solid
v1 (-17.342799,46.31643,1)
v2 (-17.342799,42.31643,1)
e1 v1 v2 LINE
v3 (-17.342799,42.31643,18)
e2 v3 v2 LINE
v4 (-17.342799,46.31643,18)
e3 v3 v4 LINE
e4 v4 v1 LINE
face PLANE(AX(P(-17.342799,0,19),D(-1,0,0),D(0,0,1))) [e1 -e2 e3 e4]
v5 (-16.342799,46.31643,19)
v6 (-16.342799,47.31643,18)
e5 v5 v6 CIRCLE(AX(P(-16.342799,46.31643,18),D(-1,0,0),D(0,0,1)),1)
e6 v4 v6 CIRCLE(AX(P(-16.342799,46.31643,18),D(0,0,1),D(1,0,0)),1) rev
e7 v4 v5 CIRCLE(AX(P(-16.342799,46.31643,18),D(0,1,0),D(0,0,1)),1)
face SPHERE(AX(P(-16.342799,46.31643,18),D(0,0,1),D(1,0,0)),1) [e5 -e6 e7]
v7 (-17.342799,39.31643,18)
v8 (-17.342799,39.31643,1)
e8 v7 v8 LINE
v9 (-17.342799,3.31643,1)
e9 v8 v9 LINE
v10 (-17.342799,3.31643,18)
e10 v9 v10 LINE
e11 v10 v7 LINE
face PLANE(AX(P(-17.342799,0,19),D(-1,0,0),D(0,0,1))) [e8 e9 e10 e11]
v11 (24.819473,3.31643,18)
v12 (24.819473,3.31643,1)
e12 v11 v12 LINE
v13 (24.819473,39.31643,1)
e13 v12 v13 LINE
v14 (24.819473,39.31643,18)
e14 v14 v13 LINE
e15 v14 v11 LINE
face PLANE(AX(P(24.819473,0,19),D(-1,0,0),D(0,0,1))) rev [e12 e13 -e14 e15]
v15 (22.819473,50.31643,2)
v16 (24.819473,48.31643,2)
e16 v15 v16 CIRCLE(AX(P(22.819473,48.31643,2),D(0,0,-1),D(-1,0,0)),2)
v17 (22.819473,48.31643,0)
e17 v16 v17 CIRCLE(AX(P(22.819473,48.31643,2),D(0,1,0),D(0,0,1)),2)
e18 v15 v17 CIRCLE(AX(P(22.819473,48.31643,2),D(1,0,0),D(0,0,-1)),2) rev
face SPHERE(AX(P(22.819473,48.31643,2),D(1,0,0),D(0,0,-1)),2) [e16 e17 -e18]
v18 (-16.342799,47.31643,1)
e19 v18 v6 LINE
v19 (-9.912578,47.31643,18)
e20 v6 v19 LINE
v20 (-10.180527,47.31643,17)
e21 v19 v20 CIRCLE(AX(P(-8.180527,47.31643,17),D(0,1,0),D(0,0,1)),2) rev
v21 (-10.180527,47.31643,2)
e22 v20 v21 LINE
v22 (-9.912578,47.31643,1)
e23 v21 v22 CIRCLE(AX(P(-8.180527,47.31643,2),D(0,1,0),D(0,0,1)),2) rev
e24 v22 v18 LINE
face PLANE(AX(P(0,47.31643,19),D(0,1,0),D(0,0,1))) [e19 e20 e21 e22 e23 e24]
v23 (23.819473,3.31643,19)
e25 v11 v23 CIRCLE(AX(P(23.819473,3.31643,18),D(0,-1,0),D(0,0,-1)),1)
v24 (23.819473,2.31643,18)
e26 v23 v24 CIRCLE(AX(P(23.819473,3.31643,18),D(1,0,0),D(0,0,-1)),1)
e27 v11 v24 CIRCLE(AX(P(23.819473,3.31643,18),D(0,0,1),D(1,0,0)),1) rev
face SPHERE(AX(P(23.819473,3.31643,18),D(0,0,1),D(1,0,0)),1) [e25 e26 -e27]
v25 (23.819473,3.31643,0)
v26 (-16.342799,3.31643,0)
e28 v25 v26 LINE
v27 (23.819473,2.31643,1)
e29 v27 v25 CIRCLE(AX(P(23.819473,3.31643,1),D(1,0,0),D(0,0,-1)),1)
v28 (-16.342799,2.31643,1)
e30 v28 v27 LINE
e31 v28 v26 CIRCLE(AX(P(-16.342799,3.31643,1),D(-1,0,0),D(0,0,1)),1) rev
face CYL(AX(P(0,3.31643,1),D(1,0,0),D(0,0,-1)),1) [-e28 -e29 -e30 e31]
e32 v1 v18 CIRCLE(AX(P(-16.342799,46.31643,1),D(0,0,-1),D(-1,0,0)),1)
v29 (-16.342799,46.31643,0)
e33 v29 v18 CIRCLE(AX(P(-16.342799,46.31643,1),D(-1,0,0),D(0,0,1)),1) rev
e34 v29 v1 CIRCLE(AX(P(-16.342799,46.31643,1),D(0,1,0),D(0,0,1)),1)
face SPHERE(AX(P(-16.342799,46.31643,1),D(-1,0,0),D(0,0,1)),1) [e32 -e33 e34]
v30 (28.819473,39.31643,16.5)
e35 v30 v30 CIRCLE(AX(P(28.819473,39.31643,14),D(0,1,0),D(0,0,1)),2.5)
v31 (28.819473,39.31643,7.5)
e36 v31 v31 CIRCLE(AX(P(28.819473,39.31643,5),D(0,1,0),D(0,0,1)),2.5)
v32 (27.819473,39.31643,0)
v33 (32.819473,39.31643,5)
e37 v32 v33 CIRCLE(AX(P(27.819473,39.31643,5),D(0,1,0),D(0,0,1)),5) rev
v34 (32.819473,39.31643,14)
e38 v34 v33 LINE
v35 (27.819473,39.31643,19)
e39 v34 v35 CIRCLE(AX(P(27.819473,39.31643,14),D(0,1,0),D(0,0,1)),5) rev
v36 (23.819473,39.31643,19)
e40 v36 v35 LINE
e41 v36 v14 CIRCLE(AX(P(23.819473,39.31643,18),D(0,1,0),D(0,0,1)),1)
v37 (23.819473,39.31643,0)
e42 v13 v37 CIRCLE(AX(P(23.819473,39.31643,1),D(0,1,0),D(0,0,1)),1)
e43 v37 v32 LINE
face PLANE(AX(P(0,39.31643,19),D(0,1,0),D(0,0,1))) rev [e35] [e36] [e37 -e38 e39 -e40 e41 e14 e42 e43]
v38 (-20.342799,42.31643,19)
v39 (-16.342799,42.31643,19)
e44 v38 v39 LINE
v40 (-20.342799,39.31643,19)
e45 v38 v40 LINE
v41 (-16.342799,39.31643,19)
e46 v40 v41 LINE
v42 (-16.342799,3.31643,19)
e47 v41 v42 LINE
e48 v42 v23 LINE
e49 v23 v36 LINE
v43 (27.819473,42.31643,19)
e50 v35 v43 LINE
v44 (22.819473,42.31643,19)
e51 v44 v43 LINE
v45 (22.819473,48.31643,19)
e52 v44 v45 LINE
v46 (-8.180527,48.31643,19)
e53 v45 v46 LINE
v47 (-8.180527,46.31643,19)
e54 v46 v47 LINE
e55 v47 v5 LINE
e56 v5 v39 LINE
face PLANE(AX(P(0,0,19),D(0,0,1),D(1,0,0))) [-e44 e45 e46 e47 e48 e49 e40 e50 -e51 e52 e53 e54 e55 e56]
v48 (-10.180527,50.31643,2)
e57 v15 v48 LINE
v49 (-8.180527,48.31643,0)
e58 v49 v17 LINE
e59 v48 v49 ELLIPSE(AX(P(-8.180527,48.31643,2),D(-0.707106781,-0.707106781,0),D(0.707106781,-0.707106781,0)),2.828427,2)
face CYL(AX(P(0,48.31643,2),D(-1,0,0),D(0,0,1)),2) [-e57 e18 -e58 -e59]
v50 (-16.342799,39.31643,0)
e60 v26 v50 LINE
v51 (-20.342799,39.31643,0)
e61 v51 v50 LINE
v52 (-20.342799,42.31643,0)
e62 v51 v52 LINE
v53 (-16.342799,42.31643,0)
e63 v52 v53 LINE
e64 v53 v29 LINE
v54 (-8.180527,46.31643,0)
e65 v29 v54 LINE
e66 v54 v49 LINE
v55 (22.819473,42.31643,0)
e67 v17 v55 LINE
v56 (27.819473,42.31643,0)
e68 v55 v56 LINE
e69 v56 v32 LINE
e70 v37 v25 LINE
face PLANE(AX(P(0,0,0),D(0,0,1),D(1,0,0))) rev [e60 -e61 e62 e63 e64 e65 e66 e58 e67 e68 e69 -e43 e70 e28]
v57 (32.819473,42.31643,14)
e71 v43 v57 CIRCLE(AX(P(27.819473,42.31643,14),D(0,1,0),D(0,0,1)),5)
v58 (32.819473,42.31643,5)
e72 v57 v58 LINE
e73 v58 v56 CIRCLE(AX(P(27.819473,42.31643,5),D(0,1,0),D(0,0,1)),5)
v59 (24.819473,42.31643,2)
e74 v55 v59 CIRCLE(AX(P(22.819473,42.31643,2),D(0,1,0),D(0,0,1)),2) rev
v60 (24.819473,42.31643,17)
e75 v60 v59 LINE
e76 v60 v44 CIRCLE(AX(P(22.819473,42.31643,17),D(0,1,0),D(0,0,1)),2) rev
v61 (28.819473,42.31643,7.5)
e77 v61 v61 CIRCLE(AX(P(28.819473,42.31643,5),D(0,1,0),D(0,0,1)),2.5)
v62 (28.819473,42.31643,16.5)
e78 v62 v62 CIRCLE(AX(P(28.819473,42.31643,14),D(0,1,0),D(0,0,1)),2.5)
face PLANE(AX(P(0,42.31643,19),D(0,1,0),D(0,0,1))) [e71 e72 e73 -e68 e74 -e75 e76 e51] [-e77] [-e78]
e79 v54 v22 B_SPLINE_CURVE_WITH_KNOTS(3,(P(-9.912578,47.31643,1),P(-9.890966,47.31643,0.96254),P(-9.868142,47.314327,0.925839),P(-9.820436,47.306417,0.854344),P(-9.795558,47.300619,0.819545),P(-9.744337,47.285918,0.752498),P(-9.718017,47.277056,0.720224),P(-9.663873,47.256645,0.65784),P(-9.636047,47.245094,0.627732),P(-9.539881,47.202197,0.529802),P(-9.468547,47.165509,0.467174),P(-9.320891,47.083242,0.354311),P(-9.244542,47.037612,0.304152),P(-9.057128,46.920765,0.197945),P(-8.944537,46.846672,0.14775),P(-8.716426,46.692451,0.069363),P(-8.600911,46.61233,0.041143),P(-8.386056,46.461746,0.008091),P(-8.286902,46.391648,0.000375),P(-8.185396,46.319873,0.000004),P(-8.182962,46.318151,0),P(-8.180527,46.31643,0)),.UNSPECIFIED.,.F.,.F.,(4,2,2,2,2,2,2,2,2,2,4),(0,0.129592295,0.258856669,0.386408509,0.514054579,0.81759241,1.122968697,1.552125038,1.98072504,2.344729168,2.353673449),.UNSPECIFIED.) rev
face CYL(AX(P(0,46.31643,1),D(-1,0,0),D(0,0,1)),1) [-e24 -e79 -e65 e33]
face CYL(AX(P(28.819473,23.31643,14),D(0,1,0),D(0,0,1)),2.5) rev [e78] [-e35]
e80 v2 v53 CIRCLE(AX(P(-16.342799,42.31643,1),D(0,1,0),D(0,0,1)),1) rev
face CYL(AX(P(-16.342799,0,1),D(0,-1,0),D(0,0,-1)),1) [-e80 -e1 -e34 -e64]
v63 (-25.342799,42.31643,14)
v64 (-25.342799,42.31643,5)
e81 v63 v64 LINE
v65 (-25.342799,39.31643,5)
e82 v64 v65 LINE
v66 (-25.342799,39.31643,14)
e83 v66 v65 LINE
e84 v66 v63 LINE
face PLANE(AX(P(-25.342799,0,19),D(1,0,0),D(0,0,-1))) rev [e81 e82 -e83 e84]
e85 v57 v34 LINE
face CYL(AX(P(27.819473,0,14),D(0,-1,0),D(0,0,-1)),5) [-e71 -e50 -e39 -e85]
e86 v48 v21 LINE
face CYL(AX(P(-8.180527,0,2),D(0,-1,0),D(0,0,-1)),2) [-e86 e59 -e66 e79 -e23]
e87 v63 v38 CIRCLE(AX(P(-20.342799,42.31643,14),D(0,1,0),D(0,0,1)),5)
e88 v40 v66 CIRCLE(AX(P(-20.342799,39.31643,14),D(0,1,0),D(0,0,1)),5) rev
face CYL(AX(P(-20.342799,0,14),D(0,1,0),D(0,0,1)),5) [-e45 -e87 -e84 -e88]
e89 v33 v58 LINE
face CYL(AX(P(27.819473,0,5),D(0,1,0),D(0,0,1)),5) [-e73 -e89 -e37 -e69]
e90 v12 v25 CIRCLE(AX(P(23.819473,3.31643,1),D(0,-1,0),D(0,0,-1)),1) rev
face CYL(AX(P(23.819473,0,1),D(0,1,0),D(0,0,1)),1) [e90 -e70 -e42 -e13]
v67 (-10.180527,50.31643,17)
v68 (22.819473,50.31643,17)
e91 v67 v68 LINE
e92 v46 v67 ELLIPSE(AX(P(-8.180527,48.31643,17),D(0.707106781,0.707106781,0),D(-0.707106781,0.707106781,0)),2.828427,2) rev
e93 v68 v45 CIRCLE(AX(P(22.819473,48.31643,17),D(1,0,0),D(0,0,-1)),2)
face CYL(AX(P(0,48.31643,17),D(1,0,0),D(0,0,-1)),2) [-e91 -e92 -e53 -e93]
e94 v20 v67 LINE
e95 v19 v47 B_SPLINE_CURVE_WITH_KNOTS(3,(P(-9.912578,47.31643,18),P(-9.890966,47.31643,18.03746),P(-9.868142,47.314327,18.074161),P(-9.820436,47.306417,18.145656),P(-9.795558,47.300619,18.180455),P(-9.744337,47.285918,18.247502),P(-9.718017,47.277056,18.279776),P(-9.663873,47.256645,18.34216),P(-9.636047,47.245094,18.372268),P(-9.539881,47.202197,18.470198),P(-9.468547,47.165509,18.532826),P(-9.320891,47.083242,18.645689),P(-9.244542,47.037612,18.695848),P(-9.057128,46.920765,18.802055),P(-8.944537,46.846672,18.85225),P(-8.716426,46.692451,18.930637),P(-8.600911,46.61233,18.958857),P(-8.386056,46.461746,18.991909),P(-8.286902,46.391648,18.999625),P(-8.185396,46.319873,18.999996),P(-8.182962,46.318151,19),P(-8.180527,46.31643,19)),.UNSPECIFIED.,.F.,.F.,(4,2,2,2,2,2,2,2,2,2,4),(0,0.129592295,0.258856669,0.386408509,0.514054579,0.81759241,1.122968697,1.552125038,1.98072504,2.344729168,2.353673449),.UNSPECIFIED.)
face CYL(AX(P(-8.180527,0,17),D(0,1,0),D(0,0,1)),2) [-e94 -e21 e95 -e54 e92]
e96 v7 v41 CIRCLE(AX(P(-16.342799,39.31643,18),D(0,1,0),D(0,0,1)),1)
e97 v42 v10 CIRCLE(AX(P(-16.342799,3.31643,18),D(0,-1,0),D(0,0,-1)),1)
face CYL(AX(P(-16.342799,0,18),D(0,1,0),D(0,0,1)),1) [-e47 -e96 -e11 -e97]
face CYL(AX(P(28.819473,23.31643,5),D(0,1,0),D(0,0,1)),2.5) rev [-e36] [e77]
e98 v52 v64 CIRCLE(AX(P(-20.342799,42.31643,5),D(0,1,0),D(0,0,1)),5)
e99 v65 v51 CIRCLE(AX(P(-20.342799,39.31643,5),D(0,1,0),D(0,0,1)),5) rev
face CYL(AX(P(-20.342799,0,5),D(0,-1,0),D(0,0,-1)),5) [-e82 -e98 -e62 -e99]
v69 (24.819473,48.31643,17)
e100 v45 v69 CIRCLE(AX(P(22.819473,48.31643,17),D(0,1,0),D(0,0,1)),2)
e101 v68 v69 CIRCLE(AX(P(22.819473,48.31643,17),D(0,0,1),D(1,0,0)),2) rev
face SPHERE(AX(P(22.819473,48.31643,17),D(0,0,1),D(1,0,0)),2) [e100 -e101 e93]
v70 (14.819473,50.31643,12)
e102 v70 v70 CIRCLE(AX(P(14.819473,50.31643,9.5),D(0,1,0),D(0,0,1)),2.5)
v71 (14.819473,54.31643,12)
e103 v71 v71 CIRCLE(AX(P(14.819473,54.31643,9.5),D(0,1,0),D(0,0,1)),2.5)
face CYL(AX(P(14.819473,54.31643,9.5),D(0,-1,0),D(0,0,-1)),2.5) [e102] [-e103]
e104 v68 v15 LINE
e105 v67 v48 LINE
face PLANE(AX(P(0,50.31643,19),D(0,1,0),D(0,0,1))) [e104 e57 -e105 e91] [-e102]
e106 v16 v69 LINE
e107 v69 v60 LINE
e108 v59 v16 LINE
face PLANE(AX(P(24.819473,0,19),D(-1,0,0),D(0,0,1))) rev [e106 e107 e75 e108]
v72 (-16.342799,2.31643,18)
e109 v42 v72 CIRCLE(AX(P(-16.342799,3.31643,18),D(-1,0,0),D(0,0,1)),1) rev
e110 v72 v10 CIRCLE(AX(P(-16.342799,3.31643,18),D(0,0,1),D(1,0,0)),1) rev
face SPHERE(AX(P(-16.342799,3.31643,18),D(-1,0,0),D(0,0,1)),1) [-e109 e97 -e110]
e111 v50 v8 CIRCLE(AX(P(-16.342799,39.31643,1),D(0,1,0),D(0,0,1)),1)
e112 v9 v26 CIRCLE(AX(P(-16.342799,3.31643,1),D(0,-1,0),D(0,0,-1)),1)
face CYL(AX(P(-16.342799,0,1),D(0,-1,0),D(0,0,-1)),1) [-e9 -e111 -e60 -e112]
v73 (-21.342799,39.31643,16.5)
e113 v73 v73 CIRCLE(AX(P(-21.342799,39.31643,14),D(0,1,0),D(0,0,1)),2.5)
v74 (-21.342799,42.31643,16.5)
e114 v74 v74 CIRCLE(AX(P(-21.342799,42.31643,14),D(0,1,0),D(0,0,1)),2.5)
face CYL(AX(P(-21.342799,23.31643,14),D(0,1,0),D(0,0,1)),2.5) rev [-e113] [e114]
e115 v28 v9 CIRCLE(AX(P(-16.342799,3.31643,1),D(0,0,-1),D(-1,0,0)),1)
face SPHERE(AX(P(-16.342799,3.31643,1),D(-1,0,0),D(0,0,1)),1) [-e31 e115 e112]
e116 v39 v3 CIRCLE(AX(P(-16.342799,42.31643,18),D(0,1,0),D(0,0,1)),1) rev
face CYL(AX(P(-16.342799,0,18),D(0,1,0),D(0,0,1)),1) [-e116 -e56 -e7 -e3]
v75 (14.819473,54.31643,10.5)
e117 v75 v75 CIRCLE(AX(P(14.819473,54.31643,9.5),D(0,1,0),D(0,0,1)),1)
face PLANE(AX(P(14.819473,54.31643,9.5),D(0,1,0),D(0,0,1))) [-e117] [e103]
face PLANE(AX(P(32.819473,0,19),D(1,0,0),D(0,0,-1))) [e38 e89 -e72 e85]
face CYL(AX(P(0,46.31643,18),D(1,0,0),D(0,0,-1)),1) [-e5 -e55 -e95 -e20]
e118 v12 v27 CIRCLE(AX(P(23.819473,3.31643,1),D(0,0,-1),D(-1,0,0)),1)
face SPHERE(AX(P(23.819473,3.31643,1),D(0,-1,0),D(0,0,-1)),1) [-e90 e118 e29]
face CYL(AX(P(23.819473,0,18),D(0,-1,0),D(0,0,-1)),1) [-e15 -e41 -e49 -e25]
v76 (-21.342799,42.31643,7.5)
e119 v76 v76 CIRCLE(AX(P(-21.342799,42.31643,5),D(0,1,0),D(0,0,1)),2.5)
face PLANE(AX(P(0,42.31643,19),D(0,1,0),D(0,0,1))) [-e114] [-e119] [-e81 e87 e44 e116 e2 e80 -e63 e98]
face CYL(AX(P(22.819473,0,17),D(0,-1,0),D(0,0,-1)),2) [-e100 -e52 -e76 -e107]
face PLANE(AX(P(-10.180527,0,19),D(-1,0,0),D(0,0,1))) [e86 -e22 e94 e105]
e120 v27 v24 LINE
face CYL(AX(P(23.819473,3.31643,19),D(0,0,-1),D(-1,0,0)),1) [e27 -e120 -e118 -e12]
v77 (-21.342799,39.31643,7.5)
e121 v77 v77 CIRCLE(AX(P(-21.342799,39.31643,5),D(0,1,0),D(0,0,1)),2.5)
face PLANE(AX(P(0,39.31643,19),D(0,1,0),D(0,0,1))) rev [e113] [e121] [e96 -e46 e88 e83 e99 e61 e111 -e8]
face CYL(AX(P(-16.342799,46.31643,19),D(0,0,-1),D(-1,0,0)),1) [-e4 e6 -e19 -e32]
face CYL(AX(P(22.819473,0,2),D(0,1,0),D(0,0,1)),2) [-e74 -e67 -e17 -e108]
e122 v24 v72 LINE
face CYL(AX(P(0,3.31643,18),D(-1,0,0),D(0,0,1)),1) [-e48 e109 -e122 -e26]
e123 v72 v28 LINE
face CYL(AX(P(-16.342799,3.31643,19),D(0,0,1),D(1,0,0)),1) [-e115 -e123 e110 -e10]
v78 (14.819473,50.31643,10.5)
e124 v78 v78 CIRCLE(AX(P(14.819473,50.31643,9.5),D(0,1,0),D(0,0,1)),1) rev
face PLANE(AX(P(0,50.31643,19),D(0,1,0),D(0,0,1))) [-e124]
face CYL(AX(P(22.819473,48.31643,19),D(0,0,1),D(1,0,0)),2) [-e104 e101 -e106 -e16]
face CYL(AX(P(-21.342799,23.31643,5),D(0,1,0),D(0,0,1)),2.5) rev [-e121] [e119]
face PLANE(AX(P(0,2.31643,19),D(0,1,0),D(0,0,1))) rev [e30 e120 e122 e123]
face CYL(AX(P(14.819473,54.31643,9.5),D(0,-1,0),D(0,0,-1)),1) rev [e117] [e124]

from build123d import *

# Parameters (mm, degrees)
SKETCH1_W           = 42.162271806
SKETCH1_H           = 37
SKETCH1_W_2         = 35
SKETCH1_H_2         = 3
BOSS_EXTRUDE1_DEPTH = 19
SKETCH2_R           = 2.5
CUT_EXTRUDE1_DEPTH  = 19
SKETCH4_R           = 2.5
SKETCH4_R_2         = 1
BOSS_EXTRUDE2_DEPTH = 4
FILLET1_R           = 2
FILLET2_R           = 2
FILLET3_R           = 5
FILLET4_R           = 1
FILLET5_R           = 1


with BuildPart() as part:
    # Sketch1 → Boss-Extrude1 (new body)
    with BuildSketch(Plane.XY):
        with Locations((3.738336714, 20.81643002)):
            Rectangle(SKETCH1_W, SKETCH1_H)
        Polygon((-25.342799189, 39.31643002), (-17.342799189, 39.31643002), (24.819472617, 39.31643002), (32.819472617, 39.31643002), (32.819472617, 42.31643002), (24.819472617, 42.31643002), (-17.342799189, 42.31643002), (-25.342799189, 42.31643002), align=None)
        Polygon((-17.342799189, 47.31643002), (-17.342799189, 42.31643002), (24.819472617, 42.31643002), (24.819472617, 47.31643002), (-10.180527383, 47.31643002), align=None)
        with Locations((7.319472617, 48.81643002)):
            Rectangle(SKETCH1_W_2, SKETCH1_H_2)
    extrude(amount=BOSS_EXTRUDE1_DEPTH)

    # Sketch2 → Cut-Extrude1 (cut)
    with BuildSketch(Plane(origin=(0, 42.31643002, 0), x_dir=(1, 0, 0), z_dir=(0, 1, 0))):
        with Locations(Location((-21.342799189, -14, 0), (0, 0, 270))):
            Circle(SKETCH2_R)
        with Locations(Location((-21.342799189, -5, 0), (0, 0, 270))):
            Circle(SKETCH2_R)
        with Locations(Location((28.819472617, -5, 0), (0, 0, 270))):
            Circle(SKETCH2_R)
        with Locations(Location((28.819472617, -14, 0), (0, 0, 270))):
            Circle(SKETCH2_R)
    extrude(amount=-CUT_EXTRUDE1_DEPTH, mode=Mode.SUBTRACT)

    # Sketch4 → Boss-Extrude2 (add)
    with BuildSketch(Plane(origin=(0, 50.31643002, 0), x_dir=(1, 0, 0), z_dir=(0, 1, 0))):
        with Locations(Location((14.819472617, -9.5, 0), (0, 0, 270))):
            Circle(SKETCH4_R)
        with Locations(Location((14.819472617, -9.5, 0), (0, 0, 270))):
            Circle(SKETCH4_R_2, mode=Mode.SUBTRACT)
    extrude(amount=BOSS_EXTRUDE2_DEPTH)

    # Fillet1
    fillet1_edges = [part.edges().sort_by_distance(p)[0] for p in [
        (-10.180527383, 48.81643002, 0),
        (-10.180527383, 48.81643002, 19),
    ]]
    fillet(fillet1_edges, radius=FILLET1_R)

    # Fillet2
    # the kernel refuses this fillet: 2 mm, written as the material it takes off along each edge
    with BuildSketch(Plane(origin=(22.819472617, 48.31643002, 2), x_dir=(1, 0, 0), z_dir=(0, 0, -1))) as fillet2_piece_1_section:
        Polygon((0, 0), (FILLET2_R * 1.02, 0), (FILLET2_R * 1.02, -FILLET2_R * 1.02), (0, -FILLET2_R * 1.02), align=None)
    fillet2_piece_1 = extrude(amount=FILLET2_R * 1.02, mode=Mode.PRIVATE)
    fillet2_piece_1 = fillet2_piece_1 - Plane(origin=(22.819472617, 48.31643002, 2), x_dir=(-0.7071067811865475, -0.7071067811865475, 0), z_dir=(0, 0, -1)) * Sphere(FILLET2_R, mode=Mode.PRIVATE)
    add(fillet2_piece_1, mode=Mode.SUBTRACT)
    with BuildSketch(Plane(origin=(22.819472617, 48.31643002, 17), x_dir=(0, 0, 1), z_dir=(1, 0, 0))) as fillet2_piece_2_section:
        Polygon((0, 0), (FILLET2_R * 1.02, 0), (FILLET2_R * 1.02, -FILLET2_R * 1.02), (0, -FILLET2_R * 1.02), align=None)
    fillet2_piece_2 = extrude(amount=FILLET2_R * 1.02, mode=Mode.PRIVATE)
    fillet2_piece_2 = fillet2_piece_2 - Plane(origin=(22.819472617, 48.31643002, 17), x_dir=(0, -0.7071067811865475, -0.7071067811865475), z_dir=(1, 0, 0)) * Sphere(FILLET2_R, mode=Mode.PRIVATE)
    add(fillet2_piece_2, mode=Mode.SUBTRACT)
    with BuildSketch(Plane(origin=(22.819472617, 50.31643002, 0), x_dir=(0, -1, 0), z_dir=(-1, 0, 0))) as fillet2_piece_3:
        with BuildLine():
            CenterArc((FILLET2_R, FILLET2_R), FILLET2_R, 180, 90)
            Line((0, FILLET2_R), (0, 0))
            Line((0, 0), (FILLET2_R, 0))
        make_face()
    extrude(amount=36, mode=Mode.SUBTRACT)
    with BuildSketch(Plane(origin=(24.819472617, 48.31643002, 0), x_dir=(-1, 0, 0), z_dir=(0, -1, 0))) as fillet2_piece_4:
        with BuildLine():
            CenterArc((FILLET2_R, -FILLET2_R), FILLET2_R, 90, 90)
            Line((0, -FILLET2_R), (0, 0))
            Line((0, 0), (FILLET2_R, 0))
        make_face()
    extrude(amount=6, mode=Mode.SUBTRACT)
    with BuildSketch(Plane(origin=(24.819472617, 42.31643002, 19), x_dir=(0, 0, -1), z_dir=(0, 1, 0))) as fillet2_piece_5:
        with BuildLine():
            CenterArc((FILLET2_R, FILLET2_R), FILLET2_R, 180, 90)
            Line((0, FILLET2_R), (0, 0))
            Line((0, 0), (FILLET2_R, 0))
        make_face()
    extrude(amount=6, mode=Mode.SUBTRACT)
    with BuildSketch(Plane(origin=(22.819472617, 50.31643002, 19), x_dir=(0, -1, 0), z_dir=(-1, 0, 0))) as fillet2_piece_6:
        with BuildLine():
            CenterArc((FILLET2_R, -FILLET2_R), FILLET2_R, 90, 90)
            Line((0, -FILLET2_R), (0, 0))
            Line((0, 0), (FILLET2_R, 0))
        make_face()
    extrude(amount=36, mode=Mode.SUBTRACT)
    with BuildSketch(Plane(origin=(24.819472617, 50.31643002, 2), x_dir=(0, -1, 0), z_dir=(0, 0, 1))) as fillet2_piece_7:
        with BuildLine():
            CenterArc((FILLET2_R, -FILLET2_R), FILLET2_R, 90, 90)
            Line((0, -FILLET2_R), (0, 0))
            Line((0, 0), (FILLET2_R, 0))
        make_face()
    extrude(amount=15, mode=Mode.SUBTRACT)

    # Fillet3
    fillet3_edges = [part.edges().sort_by_distance(p)[0] for p in [
        (-25.342799189, 40.81643002, 0),
        (32.819472617, 40.81643002, 19),
        (32.819472617, 40.81643002, 0),
        (-25.342799189, 40.81643002, 19),
    ]]
    fillet(fillet3_edges, radius=FILLET3_R)

    # Fillet4
    fillet4_edges = [part.edges().sort_by_distance(p)[0] for p in [
        (-17.342799189, 44.81643002, 0),
        (-12.761663286, 47.31643002, 0),
        (-17.342799189, 47.31643002, 9.5),
        (-12.761663286, 47.31643002, 19),
        (-17.342799189, 44.81643002, 19),
    ]]
    fillet(fillet4_edges, radius=FILLET4_R)

    # Fillet5
    fillet5_edges = [part.edges().sort_by_distance(p)[0] for p in [
        (24.819472617, 20.81643002, 19),
        (-17.342799189, 20.81643002, 0),
        (24.819472617, 20.81643002, 0),
        (3.738336714, 2.31643002, 0),
        (-17.342799189, 2.31643002, 9.5),
        (24.819472617, 2.31643002, 9.5),
        (3.738336714, 2.31643002, 19),
        (-17.342799189, 20.81643002, 19),
    ]]
    fillet(fillet5_edges, radius=FILLET5_R)


solid = part.part
